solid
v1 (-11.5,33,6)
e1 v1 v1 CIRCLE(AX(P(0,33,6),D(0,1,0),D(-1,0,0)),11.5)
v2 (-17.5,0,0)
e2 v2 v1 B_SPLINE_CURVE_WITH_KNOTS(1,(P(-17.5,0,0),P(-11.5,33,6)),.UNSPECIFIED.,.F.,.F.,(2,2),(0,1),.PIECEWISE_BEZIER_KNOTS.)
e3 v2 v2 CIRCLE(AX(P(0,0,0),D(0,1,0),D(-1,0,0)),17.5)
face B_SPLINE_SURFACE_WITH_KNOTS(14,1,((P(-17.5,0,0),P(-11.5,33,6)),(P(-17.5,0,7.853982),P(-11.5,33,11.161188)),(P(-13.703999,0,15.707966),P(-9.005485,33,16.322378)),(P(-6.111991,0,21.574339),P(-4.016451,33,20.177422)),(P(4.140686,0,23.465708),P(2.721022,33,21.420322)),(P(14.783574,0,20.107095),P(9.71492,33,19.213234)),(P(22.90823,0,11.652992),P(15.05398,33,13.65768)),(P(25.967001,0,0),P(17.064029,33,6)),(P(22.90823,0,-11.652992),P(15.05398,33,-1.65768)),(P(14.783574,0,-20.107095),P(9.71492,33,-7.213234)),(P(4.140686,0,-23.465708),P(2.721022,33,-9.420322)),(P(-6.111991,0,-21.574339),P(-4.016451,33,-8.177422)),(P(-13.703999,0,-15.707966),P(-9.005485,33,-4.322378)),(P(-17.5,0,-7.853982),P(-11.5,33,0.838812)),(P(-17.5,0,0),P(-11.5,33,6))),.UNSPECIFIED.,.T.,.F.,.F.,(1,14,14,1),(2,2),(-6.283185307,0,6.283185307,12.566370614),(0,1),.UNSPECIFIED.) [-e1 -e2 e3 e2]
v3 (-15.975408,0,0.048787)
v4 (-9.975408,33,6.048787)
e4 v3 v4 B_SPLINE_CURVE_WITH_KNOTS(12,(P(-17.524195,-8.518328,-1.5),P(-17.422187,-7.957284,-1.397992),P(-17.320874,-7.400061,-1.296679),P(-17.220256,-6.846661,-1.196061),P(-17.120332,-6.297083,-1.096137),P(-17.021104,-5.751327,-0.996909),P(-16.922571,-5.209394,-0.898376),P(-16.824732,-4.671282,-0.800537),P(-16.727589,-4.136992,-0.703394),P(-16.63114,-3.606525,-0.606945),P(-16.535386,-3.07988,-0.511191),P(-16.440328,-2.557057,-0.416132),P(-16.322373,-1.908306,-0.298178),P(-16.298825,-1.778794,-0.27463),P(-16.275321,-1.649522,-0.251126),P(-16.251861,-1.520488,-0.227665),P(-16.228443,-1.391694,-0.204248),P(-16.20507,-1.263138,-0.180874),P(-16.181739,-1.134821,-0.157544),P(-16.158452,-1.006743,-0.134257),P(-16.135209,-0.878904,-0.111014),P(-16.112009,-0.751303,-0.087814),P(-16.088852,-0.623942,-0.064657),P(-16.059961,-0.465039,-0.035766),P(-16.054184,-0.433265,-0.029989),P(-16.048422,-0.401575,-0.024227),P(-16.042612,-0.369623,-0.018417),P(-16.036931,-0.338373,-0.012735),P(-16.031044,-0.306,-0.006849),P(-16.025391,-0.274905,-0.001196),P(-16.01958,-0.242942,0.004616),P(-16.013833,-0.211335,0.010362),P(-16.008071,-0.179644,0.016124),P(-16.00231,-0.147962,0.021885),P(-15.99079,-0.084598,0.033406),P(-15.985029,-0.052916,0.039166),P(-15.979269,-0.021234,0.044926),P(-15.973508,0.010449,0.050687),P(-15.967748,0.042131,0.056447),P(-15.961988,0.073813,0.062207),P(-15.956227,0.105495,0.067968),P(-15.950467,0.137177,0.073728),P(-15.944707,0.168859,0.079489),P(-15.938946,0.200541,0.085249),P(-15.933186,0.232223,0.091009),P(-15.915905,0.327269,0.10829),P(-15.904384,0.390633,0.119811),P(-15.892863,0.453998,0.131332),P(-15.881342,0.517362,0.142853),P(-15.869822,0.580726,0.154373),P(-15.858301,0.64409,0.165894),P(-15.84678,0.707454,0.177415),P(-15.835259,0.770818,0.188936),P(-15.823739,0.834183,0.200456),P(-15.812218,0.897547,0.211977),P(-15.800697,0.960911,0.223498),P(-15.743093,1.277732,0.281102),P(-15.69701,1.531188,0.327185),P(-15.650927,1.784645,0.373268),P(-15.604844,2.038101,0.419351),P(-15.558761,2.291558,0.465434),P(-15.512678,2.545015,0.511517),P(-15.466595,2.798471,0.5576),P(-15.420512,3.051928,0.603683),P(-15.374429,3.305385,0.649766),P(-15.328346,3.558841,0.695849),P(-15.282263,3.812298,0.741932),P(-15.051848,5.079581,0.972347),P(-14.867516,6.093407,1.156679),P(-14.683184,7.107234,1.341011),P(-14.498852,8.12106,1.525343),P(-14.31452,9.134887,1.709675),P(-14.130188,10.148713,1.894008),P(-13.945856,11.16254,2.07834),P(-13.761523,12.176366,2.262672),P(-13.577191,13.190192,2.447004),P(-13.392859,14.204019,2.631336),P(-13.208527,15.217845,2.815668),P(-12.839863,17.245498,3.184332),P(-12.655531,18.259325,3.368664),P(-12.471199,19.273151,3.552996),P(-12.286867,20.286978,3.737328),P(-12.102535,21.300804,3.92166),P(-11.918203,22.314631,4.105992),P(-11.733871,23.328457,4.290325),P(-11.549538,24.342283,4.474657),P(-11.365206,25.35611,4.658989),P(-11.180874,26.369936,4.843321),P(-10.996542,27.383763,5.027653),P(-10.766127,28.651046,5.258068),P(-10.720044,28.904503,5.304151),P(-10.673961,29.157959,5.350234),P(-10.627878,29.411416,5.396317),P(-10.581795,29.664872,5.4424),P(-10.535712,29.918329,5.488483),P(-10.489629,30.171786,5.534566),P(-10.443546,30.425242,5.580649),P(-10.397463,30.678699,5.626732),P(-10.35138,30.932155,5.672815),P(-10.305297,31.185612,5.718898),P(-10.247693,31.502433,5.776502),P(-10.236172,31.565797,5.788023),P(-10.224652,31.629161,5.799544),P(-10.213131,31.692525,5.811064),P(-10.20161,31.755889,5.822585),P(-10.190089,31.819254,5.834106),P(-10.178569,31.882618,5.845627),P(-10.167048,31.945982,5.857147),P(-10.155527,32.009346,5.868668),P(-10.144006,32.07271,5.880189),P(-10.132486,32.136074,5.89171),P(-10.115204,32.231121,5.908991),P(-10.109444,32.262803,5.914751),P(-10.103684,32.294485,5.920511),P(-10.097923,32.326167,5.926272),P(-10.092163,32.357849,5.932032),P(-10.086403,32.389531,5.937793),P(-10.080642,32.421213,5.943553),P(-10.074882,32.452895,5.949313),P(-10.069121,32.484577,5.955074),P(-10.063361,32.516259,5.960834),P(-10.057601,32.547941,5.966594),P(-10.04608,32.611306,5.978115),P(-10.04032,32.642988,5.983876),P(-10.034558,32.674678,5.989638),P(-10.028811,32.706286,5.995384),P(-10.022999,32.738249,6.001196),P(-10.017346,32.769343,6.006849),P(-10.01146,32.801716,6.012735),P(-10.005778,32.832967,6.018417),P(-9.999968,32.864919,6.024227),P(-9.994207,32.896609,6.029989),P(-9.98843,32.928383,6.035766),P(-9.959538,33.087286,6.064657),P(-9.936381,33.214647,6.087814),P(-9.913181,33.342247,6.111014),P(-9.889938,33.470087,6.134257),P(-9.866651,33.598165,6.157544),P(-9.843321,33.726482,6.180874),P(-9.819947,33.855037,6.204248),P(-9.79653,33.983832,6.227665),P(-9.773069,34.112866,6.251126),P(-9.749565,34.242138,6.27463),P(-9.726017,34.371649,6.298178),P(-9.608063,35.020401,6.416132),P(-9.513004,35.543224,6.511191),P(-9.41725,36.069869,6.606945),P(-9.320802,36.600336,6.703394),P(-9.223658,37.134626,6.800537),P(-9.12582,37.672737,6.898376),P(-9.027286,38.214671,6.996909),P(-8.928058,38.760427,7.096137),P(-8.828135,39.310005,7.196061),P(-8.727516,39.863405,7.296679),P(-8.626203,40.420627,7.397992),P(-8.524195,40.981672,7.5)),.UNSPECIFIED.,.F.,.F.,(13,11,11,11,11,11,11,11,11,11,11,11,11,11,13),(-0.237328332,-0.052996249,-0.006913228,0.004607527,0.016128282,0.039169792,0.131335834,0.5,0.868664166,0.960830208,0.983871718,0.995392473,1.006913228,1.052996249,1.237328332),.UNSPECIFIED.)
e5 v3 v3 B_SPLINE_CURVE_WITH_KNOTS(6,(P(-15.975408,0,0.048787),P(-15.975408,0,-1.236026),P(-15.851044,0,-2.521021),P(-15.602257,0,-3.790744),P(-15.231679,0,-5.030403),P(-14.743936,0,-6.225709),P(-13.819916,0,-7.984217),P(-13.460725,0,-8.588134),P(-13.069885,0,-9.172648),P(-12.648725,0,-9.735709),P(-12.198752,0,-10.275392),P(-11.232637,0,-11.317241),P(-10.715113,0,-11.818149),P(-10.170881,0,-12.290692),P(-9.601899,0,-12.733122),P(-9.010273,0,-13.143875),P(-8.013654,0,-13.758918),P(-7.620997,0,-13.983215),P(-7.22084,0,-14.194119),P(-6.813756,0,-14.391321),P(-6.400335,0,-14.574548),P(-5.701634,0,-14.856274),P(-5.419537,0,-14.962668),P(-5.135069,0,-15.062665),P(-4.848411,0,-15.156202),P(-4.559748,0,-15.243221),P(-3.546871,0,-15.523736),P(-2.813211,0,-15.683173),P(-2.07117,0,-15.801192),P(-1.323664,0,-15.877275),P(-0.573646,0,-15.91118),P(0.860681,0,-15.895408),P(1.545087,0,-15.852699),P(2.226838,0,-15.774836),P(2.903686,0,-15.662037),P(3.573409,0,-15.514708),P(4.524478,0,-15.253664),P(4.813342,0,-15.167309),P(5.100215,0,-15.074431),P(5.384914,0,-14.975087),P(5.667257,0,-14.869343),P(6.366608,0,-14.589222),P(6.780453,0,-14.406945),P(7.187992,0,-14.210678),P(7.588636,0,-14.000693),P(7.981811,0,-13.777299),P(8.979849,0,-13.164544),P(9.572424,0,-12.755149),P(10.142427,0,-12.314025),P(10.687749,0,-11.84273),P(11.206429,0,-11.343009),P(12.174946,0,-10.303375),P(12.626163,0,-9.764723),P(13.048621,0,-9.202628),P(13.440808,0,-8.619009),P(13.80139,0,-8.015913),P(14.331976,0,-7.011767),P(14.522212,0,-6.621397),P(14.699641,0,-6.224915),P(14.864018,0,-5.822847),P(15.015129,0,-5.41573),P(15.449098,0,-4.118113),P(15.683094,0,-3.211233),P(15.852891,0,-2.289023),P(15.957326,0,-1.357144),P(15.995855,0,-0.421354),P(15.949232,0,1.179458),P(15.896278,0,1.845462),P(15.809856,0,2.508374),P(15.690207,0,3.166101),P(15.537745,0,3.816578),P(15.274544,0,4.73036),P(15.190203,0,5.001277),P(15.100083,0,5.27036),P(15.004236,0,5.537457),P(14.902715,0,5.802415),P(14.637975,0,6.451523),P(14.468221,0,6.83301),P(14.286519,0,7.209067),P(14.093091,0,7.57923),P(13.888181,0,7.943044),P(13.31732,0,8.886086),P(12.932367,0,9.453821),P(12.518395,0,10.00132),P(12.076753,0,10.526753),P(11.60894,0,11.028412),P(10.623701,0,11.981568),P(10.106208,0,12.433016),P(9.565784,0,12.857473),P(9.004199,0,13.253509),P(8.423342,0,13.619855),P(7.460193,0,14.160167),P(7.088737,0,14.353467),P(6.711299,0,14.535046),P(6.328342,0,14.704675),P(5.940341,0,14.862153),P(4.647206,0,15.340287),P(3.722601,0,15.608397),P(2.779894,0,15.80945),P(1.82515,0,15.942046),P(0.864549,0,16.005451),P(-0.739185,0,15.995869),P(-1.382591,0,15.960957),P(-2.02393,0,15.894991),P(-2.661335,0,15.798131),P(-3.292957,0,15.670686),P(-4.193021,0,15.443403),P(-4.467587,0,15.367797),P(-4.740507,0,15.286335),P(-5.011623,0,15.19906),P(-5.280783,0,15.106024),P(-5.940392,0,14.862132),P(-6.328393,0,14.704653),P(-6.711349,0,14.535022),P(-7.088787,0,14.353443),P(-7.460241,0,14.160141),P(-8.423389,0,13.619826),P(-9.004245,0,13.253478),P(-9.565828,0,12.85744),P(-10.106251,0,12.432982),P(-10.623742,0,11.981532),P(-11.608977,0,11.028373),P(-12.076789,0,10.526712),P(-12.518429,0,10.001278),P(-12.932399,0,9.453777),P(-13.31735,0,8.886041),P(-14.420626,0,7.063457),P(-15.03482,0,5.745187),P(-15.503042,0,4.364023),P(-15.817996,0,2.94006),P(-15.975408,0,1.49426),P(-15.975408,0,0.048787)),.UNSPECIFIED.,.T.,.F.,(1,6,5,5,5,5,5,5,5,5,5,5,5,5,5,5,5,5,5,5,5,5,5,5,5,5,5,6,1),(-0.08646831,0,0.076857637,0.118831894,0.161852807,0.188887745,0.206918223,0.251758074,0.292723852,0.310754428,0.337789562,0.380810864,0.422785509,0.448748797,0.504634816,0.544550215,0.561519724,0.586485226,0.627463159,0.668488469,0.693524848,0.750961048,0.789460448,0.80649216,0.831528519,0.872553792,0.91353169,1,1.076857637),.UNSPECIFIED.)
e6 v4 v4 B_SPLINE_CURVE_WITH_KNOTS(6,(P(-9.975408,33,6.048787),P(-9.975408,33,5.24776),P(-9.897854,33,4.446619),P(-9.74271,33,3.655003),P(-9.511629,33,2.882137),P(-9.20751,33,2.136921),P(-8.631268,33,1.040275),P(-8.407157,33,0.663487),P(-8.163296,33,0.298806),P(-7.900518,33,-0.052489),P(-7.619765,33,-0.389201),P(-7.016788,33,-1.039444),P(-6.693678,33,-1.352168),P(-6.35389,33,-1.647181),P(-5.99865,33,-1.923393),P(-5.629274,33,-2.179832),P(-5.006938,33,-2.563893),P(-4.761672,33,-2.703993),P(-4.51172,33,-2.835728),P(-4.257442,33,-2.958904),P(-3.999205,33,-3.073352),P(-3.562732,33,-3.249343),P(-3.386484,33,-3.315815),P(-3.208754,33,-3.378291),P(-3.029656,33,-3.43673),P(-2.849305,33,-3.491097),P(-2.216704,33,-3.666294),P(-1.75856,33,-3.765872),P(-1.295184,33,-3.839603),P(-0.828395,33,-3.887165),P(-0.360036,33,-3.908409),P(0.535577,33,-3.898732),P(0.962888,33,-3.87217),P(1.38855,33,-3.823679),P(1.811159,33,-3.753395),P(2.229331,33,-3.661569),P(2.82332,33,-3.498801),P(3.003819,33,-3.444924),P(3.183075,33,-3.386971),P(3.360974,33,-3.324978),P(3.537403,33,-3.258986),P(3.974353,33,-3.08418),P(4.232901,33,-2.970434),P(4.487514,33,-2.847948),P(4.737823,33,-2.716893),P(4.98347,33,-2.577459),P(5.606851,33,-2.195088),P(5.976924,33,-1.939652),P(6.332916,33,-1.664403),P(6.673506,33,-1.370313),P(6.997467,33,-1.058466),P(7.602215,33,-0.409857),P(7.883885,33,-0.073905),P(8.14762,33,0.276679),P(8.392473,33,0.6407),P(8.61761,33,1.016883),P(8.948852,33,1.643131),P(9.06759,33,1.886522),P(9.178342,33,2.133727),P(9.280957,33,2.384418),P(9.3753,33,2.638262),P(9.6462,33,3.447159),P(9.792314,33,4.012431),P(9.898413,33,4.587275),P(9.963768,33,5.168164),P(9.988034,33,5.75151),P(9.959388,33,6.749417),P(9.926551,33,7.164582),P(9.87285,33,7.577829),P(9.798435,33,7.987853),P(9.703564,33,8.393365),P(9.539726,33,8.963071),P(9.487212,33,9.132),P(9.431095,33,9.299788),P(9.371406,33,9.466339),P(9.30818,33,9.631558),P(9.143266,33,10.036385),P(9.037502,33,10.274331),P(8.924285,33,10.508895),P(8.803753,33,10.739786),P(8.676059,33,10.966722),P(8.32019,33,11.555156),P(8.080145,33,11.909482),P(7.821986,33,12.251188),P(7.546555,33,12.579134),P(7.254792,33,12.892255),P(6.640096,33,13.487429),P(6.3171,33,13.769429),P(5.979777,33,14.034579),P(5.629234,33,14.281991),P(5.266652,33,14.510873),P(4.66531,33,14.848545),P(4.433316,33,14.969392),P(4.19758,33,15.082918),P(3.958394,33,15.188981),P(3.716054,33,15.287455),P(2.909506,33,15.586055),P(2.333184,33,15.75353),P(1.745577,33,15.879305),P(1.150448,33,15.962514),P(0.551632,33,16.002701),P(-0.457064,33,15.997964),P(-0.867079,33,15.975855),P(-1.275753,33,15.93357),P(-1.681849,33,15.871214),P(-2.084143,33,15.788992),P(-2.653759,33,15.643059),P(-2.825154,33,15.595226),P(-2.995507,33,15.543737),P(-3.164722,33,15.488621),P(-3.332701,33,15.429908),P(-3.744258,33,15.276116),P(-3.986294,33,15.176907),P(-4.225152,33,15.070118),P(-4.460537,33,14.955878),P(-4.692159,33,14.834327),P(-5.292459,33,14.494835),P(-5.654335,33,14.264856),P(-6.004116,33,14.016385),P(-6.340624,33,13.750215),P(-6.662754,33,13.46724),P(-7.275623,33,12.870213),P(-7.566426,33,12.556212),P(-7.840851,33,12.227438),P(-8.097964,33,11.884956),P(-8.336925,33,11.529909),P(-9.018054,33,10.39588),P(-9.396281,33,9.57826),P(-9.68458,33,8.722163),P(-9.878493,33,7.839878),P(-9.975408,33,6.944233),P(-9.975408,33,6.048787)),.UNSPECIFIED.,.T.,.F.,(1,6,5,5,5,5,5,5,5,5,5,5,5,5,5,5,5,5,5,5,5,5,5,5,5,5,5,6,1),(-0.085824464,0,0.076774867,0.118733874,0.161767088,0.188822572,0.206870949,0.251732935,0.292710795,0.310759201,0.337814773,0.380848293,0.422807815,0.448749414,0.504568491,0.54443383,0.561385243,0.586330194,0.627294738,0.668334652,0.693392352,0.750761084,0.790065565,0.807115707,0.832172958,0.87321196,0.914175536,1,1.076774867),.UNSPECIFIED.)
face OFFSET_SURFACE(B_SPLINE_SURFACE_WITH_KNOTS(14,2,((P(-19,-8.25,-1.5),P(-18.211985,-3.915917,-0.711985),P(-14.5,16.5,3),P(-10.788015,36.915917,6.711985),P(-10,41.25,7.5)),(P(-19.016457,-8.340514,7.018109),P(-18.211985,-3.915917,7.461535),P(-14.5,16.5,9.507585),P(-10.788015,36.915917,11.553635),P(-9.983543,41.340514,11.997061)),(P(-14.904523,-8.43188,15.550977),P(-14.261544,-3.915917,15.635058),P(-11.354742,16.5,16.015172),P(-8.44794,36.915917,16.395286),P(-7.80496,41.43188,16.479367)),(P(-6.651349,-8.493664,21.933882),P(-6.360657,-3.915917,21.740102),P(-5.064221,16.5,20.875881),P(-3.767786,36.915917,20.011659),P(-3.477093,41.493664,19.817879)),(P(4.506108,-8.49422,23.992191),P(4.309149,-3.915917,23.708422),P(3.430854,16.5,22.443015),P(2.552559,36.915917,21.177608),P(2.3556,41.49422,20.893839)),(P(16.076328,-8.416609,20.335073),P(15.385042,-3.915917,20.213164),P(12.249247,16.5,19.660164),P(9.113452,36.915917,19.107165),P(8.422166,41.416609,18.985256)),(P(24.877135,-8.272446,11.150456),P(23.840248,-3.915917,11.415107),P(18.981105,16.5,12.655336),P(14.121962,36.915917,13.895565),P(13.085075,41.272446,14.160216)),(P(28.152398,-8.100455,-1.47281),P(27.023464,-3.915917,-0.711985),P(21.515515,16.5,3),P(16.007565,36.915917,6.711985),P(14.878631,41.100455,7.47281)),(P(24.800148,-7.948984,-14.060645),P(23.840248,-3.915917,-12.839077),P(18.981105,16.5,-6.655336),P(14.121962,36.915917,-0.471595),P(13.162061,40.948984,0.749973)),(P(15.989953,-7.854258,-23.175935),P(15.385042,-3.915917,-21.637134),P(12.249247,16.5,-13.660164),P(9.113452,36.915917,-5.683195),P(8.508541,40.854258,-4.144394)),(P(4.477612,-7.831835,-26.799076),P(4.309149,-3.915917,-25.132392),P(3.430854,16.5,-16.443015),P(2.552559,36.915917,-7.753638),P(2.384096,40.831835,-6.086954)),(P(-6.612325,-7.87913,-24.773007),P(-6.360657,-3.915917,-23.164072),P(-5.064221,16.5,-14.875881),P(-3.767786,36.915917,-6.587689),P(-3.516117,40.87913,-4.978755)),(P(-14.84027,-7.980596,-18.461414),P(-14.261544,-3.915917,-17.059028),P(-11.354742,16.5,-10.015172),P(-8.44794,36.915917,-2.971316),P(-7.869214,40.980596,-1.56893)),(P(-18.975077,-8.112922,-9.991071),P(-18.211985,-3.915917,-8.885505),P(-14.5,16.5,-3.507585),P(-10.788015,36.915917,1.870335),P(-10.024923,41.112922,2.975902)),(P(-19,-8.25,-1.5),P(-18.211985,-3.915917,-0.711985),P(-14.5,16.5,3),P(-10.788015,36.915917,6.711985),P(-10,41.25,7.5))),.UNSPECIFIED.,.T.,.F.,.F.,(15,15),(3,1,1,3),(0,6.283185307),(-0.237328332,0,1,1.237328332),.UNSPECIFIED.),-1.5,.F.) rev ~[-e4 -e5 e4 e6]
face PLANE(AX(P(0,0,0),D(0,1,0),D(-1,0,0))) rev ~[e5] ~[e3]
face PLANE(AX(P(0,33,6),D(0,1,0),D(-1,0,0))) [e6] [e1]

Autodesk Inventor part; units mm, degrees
ref_plane "YZ Plane" through (0, 0, 0) normal (1, 0, 0) x (0, 1, 0)
ref_plane "XY Plane" through (0, 0, 0) normal (0, 0, 1) x (1, 0, 0)
sketch "Szkic6" plane through (0, 0, 0) normal (0, 1, 0) x (-1, 0, 0)
  circle A0 centre (0, 0) radius 17.5
  dimension "d33" = 35
ref_plane "Płaszczyzna konstrukcyjna1" through (0, 33, 0) normal (0, 1, 0) x (-1, 0, 0)
sketch "Szkic7" plane through (0, 33, 0) normal (0, 1, 0) x (-1, 0, 0)
  circle A0 centre (0, 6) radius 11.5
  line L0 (0, -20.3) -> (0, 20.3) construction
  circle A1 centre (0, 0) radius 17.5 construction
  dimension "d35" = 23
loft "Wyciągnięcie złożone1" add profiles "Szkic6", "Szkic7"
shell "Skorupa1" thickness 1.5 removed faces 2 at (-0.9202, 33, 4.1972) at (-4.3663, 0, -1.0762)
equation "\"d33\" = OD1"
equation "\"d35\" = OD2"
equation "\"d52\" = THK"
equation "\"SzerokośćGięciaPodcięcia\" = Grubość"
equation "\"RozmiarPodcięciaNarożnika\" = 4 * Grubość"
equation "\"PromieńPrzejścia\" = PromieńGięcia"
equation "\"Rozmiar_promienia_Jacobiego\" = PromieńGięcia"
equation "\"Wielk_odstępu\" = Grubość"
equation "\"d2\" = PromieńGięcia"
equation "\"d23\" = PromieńGięcia"
equation "\"OD1\" = 35"
equation "\"OD2\" = 23"
equation "\"L\" = 33"
equation "\"THK\" = 1.5"
equation "\"d34\" = L"
equation "\"Grubość\" = 1.5"
equation "\"PromieńGięcia\" = 3"
properties part number "Redukcja asymetryczna Ø35x23x1,5 L=33" material "304"
